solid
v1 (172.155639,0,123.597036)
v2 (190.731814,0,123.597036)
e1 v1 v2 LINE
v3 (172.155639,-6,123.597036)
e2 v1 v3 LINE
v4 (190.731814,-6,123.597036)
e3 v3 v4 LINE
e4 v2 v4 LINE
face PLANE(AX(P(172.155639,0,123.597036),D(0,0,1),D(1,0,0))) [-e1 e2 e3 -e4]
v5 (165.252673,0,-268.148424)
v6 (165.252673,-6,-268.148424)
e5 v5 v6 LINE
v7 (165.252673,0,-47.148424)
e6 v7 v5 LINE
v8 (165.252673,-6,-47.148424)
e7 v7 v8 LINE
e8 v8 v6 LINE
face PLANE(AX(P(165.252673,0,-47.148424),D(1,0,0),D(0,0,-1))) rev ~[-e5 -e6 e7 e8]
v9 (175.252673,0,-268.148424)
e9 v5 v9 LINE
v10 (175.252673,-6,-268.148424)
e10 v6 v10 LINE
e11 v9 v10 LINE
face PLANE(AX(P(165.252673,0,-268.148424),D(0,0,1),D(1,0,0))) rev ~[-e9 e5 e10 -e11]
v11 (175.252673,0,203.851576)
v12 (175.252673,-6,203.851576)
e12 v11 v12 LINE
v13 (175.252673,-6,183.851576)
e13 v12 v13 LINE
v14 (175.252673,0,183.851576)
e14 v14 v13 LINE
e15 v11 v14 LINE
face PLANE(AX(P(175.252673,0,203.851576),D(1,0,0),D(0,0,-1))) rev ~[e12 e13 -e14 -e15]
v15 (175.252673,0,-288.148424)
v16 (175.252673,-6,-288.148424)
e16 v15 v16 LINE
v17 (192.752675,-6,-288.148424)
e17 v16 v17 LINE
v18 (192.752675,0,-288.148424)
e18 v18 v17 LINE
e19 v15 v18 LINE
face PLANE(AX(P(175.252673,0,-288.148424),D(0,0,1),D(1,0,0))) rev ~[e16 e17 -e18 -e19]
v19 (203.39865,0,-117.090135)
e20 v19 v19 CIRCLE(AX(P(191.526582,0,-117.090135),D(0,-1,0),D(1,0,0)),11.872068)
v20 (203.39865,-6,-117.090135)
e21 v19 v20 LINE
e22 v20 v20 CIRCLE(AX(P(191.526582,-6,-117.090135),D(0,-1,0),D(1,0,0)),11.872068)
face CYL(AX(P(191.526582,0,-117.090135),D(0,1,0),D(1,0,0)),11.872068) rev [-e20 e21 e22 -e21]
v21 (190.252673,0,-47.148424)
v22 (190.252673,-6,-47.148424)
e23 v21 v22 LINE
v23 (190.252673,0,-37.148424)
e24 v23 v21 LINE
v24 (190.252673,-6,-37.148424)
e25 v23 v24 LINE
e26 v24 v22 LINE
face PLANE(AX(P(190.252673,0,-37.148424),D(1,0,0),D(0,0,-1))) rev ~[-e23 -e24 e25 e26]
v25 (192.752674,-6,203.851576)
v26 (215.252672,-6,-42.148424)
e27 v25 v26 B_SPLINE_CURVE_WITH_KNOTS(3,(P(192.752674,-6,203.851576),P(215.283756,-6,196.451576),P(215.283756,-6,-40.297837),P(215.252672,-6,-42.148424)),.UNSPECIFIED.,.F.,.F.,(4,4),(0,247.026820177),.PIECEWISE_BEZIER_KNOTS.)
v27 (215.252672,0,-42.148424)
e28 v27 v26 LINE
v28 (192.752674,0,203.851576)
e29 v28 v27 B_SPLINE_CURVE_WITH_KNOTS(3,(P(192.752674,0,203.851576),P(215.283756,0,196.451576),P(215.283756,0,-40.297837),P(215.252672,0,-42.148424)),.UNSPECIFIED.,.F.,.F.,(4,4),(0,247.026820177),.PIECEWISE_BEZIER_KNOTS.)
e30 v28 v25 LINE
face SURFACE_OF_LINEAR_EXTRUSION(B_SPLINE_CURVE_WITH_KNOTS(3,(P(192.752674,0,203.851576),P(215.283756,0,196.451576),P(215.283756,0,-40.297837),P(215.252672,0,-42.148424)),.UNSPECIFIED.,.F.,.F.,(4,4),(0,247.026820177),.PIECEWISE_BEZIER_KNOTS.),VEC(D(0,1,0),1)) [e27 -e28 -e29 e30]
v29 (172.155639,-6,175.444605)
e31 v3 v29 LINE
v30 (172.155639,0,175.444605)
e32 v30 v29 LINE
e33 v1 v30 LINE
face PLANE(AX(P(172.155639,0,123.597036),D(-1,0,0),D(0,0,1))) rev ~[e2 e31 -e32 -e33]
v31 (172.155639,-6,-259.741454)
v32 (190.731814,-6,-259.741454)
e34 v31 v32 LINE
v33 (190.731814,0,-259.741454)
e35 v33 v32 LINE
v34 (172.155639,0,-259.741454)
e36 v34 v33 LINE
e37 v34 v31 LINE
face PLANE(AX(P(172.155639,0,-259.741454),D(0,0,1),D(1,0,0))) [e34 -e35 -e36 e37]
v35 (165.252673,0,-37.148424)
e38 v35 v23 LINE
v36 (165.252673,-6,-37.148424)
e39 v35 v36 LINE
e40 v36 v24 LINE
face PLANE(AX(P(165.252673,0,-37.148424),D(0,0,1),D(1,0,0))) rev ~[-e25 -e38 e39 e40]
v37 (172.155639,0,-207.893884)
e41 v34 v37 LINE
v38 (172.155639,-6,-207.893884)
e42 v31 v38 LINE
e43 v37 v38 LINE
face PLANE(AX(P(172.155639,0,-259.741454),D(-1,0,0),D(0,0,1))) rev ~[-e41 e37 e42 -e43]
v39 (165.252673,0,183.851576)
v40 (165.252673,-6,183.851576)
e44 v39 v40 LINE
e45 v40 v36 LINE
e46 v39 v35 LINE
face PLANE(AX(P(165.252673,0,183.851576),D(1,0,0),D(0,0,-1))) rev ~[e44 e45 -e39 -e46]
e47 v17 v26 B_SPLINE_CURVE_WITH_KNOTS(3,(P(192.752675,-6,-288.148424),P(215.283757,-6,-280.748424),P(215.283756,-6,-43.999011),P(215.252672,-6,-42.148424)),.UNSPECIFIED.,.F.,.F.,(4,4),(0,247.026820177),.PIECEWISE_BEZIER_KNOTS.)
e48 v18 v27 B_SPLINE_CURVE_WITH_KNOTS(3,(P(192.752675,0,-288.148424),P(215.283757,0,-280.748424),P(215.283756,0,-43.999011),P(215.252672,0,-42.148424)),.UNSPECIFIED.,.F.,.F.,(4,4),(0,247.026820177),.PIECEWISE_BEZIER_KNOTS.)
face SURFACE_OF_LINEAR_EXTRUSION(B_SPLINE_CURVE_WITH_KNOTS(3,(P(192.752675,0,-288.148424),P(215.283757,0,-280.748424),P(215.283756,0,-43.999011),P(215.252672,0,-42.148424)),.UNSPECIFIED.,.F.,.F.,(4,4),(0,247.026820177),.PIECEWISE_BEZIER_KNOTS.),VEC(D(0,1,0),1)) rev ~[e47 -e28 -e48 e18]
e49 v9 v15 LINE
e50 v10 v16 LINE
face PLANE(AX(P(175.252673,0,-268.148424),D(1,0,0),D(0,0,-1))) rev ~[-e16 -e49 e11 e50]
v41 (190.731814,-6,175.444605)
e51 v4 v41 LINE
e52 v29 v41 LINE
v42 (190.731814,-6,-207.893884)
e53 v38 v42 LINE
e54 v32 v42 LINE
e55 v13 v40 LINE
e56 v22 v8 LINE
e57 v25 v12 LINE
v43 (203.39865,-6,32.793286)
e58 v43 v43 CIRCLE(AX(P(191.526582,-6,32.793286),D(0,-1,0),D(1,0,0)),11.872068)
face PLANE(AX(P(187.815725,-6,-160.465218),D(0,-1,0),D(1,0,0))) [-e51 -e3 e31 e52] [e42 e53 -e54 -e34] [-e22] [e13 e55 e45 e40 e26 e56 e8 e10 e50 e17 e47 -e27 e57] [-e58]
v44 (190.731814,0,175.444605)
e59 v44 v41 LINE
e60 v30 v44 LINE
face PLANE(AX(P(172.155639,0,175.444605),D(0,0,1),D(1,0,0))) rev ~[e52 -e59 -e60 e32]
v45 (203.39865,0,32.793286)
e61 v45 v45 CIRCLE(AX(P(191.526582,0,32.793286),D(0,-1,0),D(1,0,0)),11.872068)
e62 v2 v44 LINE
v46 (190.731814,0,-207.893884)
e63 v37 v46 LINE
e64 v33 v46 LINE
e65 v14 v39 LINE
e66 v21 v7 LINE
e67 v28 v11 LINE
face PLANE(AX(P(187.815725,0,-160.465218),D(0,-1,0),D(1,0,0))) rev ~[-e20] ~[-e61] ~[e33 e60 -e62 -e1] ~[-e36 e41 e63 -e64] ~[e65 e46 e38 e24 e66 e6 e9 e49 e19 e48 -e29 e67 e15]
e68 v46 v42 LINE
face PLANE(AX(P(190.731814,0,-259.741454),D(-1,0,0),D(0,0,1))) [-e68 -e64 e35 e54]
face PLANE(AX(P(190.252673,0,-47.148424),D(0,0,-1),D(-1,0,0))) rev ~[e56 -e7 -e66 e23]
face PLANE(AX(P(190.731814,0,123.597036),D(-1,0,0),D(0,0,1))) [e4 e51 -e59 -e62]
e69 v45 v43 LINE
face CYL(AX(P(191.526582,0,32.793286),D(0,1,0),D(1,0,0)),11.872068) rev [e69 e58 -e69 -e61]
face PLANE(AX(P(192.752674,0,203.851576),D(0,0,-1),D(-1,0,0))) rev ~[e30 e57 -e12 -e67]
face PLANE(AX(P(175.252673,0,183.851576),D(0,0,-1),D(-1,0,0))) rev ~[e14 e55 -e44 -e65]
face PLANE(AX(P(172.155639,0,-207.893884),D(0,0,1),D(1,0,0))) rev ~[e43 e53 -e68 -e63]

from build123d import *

# Parameters (mm, degrees)
F0_W     = 18.5761749744
F0_H     = 51.8475696445
F0_R     = 11.8720680475
F1_DEPTH = 6


# Not quite as in the source:
# - ends of sketch curves that miss each other by under 0.0002 mm in the source are joined
# - a feature names something its author has since deleted; it is built from what else it names


with BuildPart() as f1:
    # F0 (on Front) → F1 (new body)
    with BuildSketch(Plane.XZ):
        with BuildLine():
            add(Edge.make_bspline(
                [(192.7526748574, -288.1484243559), (215.2837565712, -280.7484243098), (215.2837563696, -43.999011342), (215.2526721504, -42.1484243381)],
                knots=[0, 0, 0, 0, 247.0268201774, 247.0268201774, 247.0268201774, 247.0268201774], degree=3))
            Line((215.2526721504, -42.1484243381), (190.2526734349, -42.1484243613))
            Line((190.2526734349, -42.1484243613), (190.2526734349, -47.1484243613))
            Line((190.2526734349, -47.1484243613), (165.2526734349, -47.1484243613))
            Line((165.2526734349, -47.1484243613), (165.2526734349, -268.1484243613))
            Line((165.2526734349, -268.1484243613), (175.2526734349, -268.1484243613))
            Line((175.2526734349, -268.1484243613), (175.2526734349, -288.1484243613))
            Line((175.2526734349, -288.1484243613), (192.7526748574, -288.1484243559))
        make_face()
        with Locations((181.4437263322, -233.8176692815)):
            Rectangle(F0_W, F0_H, mode=Mode.SUBTRACT)
        with Locations((191.5265821529, -117.0901346)):
            Circle(F0_R, mode=Mode.SUBTRACT)
        with BuildLine():
            add(Edge.make_bspline(
                [(192.7526744386, 203.8515756413), (215.2837561649, 196.4515756336), (215.2837563665, -40.2978373342), (215.2526721504, -42.1484243381)],
                knots=[0, 0, 0, 0, 247.0268201774, 247.0268201774, 247.0268201774, 247.0268201774], degree=3))
            Line((192.7526744386, 203.8515756413), (175.2526734349, 203.8515756387))
            Line((175.2526734349, 203.8515756387), (175.2526734349, 183.8515756387))
            Line((175.2526734349, 183.8515756387), (165.2526734349, 183.8515756387))
            Line((165.2526734349, 183.8515756387), (165.2526734349, -37.1484243613))
            Line((165.2526734349, -37.1484243613), (190.2526734349, -37.1484243613))
            Line((190.2526734349, -37.1484243613), (190.2526734349, -42.1484243613))
            Line((190.2526734349, -42.1484243613), (215.2526721504, -42.1484243381))
        make_face()
        with Locations((181.4437263322, 149.5208205589)):
            Rectangle(F0_W, F0_H, mode=Mode.SUBTRACT)
        with Locations((191.5265821529, 32.7932858774)):
            Circle(F0_R, mode=Mode.SUBTRACT)
    extrude(amount=F1_DEPTH)


solid = f1.part
